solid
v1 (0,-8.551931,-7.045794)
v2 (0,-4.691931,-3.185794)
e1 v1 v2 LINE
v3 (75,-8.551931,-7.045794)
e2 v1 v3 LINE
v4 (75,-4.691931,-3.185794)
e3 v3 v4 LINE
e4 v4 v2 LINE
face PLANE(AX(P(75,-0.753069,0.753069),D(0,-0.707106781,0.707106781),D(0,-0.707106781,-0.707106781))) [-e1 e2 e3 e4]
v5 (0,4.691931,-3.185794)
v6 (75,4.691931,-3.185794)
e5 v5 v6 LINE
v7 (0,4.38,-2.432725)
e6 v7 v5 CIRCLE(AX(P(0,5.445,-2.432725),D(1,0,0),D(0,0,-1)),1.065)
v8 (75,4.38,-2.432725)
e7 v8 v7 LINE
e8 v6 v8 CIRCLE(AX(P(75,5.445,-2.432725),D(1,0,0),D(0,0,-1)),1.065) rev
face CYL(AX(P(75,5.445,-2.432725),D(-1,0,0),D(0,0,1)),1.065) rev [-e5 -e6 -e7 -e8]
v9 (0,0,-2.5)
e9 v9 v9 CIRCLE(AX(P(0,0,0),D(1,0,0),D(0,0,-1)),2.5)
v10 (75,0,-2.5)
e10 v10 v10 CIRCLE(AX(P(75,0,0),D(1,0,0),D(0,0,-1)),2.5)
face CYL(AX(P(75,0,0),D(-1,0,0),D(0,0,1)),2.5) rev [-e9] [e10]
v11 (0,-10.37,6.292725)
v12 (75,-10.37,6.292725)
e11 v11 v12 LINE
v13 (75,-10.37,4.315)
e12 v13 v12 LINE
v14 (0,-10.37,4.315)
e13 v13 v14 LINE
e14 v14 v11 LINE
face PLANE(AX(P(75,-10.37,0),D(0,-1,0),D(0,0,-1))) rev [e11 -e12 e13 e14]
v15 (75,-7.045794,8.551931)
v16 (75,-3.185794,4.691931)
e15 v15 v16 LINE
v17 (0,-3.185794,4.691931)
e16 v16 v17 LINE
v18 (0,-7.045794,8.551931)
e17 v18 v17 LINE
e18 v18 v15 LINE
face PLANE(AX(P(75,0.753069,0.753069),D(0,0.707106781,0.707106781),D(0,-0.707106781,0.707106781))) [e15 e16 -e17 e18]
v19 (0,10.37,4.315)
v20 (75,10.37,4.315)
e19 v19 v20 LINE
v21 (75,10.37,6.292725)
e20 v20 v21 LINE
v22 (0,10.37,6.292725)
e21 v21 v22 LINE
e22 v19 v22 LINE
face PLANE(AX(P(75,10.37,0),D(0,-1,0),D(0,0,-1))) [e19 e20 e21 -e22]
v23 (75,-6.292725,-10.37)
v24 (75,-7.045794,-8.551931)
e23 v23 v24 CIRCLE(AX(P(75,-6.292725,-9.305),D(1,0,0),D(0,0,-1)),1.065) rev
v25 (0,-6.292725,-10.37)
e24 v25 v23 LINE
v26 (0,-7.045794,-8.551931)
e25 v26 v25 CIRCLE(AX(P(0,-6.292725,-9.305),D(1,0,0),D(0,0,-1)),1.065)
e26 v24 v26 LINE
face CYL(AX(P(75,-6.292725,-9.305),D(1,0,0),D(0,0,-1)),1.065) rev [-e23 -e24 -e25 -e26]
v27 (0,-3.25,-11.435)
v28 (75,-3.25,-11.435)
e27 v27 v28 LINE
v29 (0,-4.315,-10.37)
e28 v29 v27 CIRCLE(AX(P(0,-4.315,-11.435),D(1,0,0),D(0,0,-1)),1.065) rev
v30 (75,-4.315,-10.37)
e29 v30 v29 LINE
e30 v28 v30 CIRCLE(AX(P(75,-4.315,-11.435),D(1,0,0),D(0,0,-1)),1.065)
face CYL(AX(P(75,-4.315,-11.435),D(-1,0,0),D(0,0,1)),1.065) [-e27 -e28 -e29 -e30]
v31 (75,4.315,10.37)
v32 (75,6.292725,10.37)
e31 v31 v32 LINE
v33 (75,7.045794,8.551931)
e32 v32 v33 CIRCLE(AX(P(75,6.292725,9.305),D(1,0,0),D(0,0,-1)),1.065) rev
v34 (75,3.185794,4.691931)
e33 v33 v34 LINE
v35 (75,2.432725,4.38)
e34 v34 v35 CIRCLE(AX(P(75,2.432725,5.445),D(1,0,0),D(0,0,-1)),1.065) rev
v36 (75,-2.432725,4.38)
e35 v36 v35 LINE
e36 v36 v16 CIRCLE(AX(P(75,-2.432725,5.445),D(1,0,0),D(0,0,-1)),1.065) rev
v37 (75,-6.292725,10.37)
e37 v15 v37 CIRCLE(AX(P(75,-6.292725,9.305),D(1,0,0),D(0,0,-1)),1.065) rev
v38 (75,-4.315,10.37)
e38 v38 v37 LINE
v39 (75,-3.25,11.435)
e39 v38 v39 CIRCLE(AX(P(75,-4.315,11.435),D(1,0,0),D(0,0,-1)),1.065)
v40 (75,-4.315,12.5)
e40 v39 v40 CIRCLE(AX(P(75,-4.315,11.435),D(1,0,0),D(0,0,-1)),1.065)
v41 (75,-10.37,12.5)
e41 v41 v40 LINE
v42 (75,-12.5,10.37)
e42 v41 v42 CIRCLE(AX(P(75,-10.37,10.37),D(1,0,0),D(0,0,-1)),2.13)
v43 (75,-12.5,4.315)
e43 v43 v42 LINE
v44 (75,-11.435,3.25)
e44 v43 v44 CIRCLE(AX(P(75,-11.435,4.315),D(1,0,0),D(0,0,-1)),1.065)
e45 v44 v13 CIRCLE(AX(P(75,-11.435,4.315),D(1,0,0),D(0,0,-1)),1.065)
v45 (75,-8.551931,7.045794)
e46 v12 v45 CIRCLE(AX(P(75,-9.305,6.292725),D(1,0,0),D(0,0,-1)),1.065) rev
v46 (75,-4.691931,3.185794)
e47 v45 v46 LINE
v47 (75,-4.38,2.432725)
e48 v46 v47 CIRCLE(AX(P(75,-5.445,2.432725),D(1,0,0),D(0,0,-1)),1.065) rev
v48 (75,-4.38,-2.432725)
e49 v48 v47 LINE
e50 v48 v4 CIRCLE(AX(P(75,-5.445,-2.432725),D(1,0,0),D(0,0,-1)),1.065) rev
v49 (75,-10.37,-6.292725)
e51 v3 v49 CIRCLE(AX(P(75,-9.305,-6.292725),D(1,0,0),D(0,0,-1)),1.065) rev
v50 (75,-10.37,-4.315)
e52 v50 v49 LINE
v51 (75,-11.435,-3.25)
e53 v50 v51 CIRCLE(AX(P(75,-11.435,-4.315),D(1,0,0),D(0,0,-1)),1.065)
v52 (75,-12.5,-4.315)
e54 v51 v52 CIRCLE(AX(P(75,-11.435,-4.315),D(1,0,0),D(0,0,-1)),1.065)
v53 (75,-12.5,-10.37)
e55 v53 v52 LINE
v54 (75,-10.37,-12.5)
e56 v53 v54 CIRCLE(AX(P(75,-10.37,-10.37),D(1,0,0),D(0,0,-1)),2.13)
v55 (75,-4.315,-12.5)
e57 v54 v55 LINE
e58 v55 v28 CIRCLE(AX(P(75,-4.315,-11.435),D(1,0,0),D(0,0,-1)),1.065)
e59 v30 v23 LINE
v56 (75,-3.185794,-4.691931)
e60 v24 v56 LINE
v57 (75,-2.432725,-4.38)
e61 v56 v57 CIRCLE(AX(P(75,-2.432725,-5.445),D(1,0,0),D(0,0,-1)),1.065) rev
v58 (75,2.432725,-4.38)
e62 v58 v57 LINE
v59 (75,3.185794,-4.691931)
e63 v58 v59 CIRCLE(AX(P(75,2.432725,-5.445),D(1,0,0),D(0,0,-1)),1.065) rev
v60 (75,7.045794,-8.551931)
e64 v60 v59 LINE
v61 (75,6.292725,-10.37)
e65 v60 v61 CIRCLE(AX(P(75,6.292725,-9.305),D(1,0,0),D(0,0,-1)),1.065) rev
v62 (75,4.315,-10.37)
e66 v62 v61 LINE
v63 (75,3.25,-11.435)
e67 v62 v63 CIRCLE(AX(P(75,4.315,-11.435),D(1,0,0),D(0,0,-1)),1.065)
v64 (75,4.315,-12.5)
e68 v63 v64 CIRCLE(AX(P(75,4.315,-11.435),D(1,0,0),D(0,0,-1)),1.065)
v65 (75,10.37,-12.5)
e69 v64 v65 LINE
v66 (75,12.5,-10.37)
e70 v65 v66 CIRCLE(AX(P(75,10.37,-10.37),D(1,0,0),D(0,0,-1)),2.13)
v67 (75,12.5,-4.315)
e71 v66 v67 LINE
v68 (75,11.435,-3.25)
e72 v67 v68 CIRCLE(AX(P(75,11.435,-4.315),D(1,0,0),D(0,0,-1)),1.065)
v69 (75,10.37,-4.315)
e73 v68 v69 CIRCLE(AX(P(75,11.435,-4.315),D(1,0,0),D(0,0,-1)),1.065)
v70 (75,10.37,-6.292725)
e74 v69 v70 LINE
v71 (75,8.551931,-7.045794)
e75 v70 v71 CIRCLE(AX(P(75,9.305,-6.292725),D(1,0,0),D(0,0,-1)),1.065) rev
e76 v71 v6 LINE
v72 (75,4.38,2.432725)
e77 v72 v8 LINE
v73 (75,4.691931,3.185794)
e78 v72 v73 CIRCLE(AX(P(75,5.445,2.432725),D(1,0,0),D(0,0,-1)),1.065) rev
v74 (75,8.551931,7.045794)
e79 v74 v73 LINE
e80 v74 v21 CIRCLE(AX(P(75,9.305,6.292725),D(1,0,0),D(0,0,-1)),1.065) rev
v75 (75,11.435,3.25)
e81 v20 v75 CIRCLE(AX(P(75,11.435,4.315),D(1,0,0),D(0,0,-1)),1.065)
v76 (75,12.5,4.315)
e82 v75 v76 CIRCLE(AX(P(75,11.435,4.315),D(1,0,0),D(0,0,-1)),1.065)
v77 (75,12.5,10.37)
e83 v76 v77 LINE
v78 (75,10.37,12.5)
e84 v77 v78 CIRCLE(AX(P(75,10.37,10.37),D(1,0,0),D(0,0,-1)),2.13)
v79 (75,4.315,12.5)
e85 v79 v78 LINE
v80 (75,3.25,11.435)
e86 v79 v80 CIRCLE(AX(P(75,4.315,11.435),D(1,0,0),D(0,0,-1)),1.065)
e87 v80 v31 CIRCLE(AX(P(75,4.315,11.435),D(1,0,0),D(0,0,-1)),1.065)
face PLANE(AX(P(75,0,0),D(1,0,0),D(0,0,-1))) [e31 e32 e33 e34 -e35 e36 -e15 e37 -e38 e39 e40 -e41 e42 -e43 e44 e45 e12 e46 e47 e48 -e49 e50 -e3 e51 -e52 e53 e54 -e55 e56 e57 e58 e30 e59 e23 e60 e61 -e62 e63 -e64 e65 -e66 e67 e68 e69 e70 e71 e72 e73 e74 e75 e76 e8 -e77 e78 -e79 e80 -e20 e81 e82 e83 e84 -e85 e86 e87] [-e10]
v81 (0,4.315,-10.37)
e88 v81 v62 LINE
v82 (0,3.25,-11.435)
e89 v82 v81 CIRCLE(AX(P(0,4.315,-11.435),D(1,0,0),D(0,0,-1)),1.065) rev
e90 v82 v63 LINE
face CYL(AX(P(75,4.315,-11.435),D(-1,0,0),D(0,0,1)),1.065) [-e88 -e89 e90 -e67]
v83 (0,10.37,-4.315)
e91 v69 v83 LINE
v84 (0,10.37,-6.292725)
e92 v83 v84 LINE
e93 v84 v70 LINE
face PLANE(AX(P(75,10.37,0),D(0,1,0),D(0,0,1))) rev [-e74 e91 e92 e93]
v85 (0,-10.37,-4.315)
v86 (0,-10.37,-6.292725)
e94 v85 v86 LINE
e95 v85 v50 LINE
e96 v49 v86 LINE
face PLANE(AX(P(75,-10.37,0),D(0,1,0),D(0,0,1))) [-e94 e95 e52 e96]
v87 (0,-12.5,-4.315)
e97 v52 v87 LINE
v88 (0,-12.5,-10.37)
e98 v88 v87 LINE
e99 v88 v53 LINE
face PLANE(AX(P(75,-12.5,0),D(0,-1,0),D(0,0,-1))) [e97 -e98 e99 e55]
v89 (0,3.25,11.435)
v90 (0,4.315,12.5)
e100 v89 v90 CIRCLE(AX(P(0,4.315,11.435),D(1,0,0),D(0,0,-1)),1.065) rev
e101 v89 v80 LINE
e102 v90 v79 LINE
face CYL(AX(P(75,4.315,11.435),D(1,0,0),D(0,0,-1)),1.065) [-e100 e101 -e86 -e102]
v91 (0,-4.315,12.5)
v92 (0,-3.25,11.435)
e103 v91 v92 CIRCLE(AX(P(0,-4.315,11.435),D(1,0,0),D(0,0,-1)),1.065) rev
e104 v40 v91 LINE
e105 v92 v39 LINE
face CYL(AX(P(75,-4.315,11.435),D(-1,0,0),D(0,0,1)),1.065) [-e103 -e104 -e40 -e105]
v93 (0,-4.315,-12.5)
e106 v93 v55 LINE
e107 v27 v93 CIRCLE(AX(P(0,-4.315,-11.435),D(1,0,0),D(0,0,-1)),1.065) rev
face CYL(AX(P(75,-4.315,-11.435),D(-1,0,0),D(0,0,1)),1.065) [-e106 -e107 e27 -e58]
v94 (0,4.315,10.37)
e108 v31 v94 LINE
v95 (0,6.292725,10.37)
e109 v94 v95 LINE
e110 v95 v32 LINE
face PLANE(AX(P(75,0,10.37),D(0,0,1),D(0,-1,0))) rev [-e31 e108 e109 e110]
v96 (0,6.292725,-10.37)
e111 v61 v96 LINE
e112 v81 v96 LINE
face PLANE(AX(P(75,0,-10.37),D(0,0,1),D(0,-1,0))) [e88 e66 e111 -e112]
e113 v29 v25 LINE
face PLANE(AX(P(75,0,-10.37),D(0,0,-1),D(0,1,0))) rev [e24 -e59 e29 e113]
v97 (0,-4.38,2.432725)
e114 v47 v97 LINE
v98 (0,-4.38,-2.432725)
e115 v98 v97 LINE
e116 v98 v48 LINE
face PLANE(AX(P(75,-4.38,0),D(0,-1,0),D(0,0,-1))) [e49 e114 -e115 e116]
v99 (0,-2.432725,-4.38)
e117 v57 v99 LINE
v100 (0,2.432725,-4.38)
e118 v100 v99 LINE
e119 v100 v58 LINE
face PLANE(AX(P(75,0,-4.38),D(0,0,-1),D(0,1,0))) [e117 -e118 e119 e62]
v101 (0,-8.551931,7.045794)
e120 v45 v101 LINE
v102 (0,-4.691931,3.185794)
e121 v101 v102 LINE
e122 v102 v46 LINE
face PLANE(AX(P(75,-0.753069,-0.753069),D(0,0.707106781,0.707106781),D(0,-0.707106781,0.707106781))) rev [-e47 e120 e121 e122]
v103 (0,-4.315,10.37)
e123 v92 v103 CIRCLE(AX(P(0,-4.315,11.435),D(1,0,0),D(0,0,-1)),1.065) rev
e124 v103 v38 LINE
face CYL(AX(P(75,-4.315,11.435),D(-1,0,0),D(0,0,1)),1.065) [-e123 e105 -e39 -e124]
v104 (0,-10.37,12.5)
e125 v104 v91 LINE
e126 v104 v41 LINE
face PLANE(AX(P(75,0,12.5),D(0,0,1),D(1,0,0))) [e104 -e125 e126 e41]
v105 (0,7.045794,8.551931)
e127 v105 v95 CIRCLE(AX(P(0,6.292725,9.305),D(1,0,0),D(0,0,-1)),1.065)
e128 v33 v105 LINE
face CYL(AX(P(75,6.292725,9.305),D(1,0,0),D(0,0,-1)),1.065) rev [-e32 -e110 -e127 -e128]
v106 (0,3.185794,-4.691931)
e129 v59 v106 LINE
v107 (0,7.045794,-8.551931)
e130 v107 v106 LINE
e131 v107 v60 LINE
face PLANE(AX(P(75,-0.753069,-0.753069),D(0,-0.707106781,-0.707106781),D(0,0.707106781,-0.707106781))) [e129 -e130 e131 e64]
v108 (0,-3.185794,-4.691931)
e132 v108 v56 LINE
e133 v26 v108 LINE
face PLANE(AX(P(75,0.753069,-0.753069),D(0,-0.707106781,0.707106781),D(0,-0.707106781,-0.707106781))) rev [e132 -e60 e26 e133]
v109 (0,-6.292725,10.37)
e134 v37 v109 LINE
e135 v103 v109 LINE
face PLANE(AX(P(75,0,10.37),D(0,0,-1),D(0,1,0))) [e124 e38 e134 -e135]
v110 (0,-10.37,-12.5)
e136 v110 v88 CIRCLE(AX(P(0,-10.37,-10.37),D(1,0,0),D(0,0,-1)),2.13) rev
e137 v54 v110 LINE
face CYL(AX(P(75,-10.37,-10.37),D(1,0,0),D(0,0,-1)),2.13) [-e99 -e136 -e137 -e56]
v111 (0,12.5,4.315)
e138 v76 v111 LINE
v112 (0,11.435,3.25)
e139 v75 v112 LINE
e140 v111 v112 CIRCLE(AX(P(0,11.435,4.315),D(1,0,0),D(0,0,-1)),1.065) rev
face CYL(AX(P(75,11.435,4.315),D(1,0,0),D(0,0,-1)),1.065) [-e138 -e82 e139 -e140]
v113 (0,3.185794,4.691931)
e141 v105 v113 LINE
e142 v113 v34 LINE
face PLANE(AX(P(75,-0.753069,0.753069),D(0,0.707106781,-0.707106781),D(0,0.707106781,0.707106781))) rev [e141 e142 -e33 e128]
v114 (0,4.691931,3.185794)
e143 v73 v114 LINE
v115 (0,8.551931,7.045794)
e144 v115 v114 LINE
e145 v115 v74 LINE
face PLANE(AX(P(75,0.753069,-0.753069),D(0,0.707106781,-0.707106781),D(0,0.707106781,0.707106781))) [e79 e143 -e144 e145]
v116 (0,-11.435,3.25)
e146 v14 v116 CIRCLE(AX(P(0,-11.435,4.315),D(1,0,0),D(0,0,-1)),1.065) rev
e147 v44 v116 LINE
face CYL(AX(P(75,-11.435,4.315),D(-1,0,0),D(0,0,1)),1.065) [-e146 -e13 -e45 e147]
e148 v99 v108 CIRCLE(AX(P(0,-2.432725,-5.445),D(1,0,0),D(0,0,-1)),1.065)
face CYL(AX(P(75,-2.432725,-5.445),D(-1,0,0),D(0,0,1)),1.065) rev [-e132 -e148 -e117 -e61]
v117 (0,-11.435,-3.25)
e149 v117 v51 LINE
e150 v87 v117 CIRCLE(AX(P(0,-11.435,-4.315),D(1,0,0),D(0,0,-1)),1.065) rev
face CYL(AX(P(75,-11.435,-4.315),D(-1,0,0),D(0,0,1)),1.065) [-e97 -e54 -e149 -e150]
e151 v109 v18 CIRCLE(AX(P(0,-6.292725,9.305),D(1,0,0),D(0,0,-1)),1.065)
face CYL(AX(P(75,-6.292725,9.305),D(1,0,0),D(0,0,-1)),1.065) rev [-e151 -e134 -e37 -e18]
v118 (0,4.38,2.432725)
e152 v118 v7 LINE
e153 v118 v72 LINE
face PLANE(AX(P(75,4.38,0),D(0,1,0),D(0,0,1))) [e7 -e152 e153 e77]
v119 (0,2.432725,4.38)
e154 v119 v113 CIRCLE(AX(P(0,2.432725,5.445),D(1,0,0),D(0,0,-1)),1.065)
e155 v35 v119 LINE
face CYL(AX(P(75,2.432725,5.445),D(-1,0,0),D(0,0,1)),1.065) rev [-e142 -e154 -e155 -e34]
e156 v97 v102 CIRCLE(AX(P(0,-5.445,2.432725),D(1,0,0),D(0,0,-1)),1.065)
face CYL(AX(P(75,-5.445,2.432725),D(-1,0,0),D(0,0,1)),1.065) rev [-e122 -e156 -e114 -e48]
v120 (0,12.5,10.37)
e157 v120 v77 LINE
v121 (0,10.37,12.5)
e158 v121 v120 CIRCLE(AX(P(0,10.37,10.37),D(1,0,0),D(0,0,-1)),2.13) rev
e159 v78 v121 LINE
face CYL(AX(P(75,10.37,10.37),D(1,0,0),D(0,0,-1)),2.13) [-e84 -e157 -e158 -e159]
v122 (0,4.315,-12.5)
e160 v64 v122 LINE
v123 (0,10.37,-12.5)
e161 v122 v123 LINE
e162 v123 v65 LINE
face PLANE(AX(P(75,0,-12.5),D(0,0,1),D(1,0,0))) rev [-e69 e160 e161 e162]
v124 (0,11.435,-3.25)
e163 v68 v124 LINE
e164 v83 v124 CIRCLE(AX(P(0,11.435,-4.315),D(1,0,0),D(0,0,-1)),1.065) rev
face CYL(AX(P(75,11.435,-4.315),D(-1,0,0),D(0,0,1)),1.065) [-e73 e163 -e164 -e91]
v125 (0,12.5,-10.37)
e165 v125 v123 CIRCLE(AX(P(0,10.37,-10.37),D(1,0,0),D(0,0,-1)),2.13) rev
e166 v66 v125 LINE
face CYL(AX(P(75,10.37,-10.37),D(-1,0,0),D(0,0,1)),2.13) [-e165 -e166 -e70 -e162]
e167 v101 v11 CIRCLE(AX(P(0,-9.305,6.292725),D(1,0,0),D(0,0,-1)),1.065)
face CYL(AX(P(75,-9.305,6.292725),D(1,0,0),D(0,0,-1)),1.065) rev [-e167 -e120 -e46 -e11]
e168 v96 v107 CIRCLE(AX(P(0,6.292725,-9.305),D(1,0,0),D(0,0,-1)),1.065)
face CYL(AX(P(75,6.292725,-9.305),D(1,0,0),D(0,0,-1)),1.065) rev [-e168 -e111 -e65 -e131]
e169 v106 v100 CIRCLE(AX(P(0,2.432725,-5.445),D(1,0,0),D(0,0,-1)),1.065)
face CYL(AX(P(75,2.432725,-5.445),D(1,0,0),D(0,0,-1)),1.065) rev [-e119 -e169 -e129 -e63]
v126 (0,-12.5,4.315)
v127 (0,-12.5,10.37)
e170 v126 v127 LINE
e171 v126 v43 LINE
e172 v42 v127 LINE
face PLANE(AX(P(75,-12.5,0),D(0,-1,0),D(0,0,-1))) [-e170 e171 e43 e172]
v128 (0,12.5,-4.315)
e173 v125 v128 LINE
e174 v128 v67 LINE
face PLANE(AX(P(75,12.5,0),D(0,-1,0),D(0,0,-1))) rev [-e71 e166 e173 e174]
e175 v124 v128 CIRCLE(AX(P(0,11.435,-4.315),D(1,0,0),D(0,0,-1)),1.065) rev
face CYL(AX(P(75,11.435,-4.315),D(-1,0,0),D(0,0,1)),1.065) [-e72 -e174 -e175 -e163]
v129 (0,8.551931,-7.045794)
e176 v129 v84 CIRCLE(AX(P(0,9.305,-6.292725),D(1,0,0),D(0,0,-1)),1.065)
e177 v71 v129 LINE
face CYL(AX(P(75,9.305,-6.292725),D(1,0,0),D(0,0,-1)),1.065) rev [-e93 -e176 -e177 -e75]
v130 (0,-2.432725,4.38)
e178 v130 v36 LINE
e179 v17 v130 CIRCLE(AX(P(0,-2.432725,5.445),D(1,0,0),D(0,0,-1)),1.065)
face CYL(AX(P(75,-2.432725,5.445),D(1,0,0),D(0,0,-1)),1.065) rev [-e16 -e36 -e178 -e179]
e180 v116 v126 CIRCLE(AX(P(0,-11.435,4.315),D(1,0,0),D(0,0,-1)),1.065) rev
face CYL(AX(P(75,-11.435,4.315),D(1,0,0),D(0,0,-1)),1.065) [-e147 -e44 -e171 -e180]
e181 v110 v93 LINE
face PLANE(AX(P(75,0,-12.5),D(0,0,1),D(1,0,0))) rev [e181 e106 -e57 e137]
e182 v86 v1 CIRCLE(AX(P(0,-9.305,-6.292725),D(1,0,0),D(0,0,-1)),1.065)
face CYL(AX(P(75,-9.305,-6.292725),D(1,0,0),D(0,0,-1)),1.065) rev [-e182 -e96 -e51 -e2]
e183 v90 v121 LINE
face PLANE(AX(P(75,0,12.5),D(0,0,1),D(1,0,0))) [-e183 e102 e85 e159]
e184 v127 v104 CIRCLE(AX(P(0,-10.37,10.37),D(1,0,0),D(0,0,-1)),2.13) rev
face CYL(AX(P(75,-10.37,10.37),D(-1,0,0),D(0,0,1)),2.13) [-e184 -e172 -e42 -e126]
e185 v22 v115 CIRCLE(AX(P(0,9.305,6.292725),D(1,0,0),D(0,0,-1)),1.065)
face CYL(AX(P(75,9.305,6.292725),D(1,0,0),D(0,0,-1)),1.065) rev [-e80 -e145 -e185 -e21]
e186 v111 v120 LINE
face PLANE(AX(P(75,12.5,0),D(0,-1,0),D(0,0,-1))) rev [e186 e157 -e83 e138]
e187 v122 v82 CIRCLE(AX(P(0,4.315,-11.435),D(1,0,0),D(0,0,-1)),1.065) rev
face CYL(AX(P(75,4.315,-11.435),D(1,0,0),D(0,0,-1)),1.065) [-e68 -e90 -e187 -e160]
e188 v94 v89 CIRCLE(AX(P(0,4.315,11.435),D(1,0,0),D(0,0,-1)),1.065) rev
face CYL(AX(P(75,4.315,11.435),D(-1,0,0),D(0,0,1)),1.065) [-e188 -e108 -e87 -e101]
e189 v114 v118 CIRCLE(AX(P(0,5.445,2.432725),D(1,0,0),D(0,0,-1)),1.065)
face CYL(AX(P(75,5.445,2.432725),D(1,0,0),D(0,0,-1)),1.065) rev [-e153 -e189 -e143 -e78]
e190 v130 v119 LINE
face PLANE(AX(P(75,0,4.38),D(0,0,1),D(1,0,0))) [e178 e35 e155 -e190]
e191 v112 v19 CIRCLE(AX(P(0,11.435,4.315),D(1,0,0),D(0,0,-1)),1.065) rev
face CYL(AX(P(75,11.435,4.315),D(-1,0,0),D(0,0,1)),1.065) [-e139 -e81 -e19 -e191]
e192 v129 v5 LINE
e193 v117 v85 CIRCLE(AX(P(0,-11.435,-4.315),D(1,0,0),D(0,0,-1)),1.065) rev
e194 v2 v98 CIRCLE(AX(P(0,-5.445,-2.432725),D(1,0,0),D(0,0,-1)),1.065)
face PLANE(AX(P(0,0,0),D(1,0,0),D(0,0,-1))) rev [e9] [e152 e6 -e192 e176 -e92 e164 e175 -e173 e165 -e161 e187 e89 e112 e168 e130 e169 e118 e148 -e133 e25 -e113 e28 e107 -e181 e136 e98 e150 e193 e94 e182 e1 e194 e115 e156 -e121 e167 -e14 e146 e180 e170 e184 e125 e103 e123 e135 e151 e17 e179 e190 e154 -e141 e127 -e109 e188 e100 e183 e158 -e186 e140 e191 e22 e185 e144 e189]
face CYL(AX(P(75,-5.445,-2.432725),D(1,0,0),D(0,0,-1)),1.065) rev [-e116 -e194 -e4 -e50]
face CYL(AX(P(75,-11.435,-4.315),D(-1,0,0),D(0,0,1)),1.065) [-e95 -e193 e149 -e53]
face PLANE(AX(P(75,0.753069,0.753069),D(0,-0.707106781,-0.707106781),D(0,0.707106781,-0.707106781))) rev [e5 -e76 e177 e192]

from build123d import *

# Parameters (mm, degrees)
SKETCH1_R           = 2.5
BOSS_EXTRUDE1_DEPTH = 75
FILLET1_R           = 1.065
FILLET2_R           = 2.13


with BuildPart() as part:
    # Sketch1 → Boss-Extrude1 (new body)
    with BuildSketch(Plane.YZ):
        Polygon((-12.5, -3.25), (-12.5, -12.5), (-3.25, -12.5), (-3.25, -10.37), (-8.863862556, -10.37), (-2.873862556, -4.38), (2.873862556, -4.38), (8.863862556, -10.37), (3.25, -10.37), (3.25, -12.5), (12.5, -12.5), (12.5, -3.25), (10.37, -3.25), (10.37, -8.863862556), (4.38, -2.873862556), (4.38, 2.873862556), (10.37, 8.863862556), (10.37, 3.25), (12.5, 3.25), (12.5, 12.5), (3.25, 12.5), (3.25, 10.37), (8.863862556, 10.37), (2.873862556, 4.38), (-2.873862556, 4.38), (-8.863862556, 10.37), (-3.25, 10.37), (-3.25, 12.5), (-12.5, 12.5), (-12.5, 3.25), (-10.37, 3.25), (-10.37, 8.863862556), (-4.38, 2.873862556), (-4.38, -2.873862556), (-10.37, -8.863862556), (-10.37, -3.25), align=None)
        with Locations(Location((0, 0, 0), (0, 0, 270))):
            Circle(SKETCH1_R, mode=Mode.SUBTRACT)
    extrude(amount=BOSS_EXTRUDE1_DEPTH)

    # Fillet1
    fillet1_edges = [part.edges().sort_by_distance(p)[0] for p in [
        (37.5, -10.37, -8.863862556),
        (37.5, 2.873862556, -4.38),
        (37.5, -2.873862556, -4.38),
        (37.5, -4.38, 2.873862556),
        (37.5, -4.38, -2.873862556),
        (37.5, -2.873862556, 4.38),
        (37.5, 2.873862556, 4.38),
        (37.5, 4.38, 2.873862556),
        (37.5, 4.38, -2.873862556),
        (37.5, -8.863862556, -10.37),
        (37.5, 8.863862556, -10.37),
        (37.5, 10.37, -8.863862556),
        (37.5, -10.37, 8.863862556),
        (37.5, -8.863862556, 10.37),
        (37.5, 10.37, 8.863862556),
        (37.5, 8.863862556, 10.37),
        (37.5, 12.5, 3.25),
        (37.5, -3.25, -12.5),
        (37.5, -10.37, 3.25),
        (37.5, 10.37, 3.25),
        (37.5, -10.37, -3.25),
        (37.5, -12.5, -3.25),
        (37.5, -12.5, 3.25),
        (37.5, 3.25, -10.37),
        (37.5, -3.25, -10.37),
        (37.5, 3.25, -12.5),
        (37.5, 10.37, -3.25),
        (37.5, 12.5, -3.25),
        (37.5, 3.25, 12.5),
        (37.5, 3.25, 10.37),
        (37.5, -3.25, 10.37),
        (37.5, -3.25, 12.5),
    ]]
    fillet(fillet1_edges, radius=FILLET1_R - 0.0001)  # a hair under: the kernel refuses the full size

    # Fillet2
    fillet2_edges = [part.edges().sort_by_distance(p)[0] for p in [
        (37.5, -12.5, 12.5),
        (37.5, 12.5, 12.5),
        (37.5, 12.5, -12.5),
        (37.5, -12.5, -12.5),
    ]]
    fillet(fillet2_edges, radius=FILLET2_R)


solid = part.part
